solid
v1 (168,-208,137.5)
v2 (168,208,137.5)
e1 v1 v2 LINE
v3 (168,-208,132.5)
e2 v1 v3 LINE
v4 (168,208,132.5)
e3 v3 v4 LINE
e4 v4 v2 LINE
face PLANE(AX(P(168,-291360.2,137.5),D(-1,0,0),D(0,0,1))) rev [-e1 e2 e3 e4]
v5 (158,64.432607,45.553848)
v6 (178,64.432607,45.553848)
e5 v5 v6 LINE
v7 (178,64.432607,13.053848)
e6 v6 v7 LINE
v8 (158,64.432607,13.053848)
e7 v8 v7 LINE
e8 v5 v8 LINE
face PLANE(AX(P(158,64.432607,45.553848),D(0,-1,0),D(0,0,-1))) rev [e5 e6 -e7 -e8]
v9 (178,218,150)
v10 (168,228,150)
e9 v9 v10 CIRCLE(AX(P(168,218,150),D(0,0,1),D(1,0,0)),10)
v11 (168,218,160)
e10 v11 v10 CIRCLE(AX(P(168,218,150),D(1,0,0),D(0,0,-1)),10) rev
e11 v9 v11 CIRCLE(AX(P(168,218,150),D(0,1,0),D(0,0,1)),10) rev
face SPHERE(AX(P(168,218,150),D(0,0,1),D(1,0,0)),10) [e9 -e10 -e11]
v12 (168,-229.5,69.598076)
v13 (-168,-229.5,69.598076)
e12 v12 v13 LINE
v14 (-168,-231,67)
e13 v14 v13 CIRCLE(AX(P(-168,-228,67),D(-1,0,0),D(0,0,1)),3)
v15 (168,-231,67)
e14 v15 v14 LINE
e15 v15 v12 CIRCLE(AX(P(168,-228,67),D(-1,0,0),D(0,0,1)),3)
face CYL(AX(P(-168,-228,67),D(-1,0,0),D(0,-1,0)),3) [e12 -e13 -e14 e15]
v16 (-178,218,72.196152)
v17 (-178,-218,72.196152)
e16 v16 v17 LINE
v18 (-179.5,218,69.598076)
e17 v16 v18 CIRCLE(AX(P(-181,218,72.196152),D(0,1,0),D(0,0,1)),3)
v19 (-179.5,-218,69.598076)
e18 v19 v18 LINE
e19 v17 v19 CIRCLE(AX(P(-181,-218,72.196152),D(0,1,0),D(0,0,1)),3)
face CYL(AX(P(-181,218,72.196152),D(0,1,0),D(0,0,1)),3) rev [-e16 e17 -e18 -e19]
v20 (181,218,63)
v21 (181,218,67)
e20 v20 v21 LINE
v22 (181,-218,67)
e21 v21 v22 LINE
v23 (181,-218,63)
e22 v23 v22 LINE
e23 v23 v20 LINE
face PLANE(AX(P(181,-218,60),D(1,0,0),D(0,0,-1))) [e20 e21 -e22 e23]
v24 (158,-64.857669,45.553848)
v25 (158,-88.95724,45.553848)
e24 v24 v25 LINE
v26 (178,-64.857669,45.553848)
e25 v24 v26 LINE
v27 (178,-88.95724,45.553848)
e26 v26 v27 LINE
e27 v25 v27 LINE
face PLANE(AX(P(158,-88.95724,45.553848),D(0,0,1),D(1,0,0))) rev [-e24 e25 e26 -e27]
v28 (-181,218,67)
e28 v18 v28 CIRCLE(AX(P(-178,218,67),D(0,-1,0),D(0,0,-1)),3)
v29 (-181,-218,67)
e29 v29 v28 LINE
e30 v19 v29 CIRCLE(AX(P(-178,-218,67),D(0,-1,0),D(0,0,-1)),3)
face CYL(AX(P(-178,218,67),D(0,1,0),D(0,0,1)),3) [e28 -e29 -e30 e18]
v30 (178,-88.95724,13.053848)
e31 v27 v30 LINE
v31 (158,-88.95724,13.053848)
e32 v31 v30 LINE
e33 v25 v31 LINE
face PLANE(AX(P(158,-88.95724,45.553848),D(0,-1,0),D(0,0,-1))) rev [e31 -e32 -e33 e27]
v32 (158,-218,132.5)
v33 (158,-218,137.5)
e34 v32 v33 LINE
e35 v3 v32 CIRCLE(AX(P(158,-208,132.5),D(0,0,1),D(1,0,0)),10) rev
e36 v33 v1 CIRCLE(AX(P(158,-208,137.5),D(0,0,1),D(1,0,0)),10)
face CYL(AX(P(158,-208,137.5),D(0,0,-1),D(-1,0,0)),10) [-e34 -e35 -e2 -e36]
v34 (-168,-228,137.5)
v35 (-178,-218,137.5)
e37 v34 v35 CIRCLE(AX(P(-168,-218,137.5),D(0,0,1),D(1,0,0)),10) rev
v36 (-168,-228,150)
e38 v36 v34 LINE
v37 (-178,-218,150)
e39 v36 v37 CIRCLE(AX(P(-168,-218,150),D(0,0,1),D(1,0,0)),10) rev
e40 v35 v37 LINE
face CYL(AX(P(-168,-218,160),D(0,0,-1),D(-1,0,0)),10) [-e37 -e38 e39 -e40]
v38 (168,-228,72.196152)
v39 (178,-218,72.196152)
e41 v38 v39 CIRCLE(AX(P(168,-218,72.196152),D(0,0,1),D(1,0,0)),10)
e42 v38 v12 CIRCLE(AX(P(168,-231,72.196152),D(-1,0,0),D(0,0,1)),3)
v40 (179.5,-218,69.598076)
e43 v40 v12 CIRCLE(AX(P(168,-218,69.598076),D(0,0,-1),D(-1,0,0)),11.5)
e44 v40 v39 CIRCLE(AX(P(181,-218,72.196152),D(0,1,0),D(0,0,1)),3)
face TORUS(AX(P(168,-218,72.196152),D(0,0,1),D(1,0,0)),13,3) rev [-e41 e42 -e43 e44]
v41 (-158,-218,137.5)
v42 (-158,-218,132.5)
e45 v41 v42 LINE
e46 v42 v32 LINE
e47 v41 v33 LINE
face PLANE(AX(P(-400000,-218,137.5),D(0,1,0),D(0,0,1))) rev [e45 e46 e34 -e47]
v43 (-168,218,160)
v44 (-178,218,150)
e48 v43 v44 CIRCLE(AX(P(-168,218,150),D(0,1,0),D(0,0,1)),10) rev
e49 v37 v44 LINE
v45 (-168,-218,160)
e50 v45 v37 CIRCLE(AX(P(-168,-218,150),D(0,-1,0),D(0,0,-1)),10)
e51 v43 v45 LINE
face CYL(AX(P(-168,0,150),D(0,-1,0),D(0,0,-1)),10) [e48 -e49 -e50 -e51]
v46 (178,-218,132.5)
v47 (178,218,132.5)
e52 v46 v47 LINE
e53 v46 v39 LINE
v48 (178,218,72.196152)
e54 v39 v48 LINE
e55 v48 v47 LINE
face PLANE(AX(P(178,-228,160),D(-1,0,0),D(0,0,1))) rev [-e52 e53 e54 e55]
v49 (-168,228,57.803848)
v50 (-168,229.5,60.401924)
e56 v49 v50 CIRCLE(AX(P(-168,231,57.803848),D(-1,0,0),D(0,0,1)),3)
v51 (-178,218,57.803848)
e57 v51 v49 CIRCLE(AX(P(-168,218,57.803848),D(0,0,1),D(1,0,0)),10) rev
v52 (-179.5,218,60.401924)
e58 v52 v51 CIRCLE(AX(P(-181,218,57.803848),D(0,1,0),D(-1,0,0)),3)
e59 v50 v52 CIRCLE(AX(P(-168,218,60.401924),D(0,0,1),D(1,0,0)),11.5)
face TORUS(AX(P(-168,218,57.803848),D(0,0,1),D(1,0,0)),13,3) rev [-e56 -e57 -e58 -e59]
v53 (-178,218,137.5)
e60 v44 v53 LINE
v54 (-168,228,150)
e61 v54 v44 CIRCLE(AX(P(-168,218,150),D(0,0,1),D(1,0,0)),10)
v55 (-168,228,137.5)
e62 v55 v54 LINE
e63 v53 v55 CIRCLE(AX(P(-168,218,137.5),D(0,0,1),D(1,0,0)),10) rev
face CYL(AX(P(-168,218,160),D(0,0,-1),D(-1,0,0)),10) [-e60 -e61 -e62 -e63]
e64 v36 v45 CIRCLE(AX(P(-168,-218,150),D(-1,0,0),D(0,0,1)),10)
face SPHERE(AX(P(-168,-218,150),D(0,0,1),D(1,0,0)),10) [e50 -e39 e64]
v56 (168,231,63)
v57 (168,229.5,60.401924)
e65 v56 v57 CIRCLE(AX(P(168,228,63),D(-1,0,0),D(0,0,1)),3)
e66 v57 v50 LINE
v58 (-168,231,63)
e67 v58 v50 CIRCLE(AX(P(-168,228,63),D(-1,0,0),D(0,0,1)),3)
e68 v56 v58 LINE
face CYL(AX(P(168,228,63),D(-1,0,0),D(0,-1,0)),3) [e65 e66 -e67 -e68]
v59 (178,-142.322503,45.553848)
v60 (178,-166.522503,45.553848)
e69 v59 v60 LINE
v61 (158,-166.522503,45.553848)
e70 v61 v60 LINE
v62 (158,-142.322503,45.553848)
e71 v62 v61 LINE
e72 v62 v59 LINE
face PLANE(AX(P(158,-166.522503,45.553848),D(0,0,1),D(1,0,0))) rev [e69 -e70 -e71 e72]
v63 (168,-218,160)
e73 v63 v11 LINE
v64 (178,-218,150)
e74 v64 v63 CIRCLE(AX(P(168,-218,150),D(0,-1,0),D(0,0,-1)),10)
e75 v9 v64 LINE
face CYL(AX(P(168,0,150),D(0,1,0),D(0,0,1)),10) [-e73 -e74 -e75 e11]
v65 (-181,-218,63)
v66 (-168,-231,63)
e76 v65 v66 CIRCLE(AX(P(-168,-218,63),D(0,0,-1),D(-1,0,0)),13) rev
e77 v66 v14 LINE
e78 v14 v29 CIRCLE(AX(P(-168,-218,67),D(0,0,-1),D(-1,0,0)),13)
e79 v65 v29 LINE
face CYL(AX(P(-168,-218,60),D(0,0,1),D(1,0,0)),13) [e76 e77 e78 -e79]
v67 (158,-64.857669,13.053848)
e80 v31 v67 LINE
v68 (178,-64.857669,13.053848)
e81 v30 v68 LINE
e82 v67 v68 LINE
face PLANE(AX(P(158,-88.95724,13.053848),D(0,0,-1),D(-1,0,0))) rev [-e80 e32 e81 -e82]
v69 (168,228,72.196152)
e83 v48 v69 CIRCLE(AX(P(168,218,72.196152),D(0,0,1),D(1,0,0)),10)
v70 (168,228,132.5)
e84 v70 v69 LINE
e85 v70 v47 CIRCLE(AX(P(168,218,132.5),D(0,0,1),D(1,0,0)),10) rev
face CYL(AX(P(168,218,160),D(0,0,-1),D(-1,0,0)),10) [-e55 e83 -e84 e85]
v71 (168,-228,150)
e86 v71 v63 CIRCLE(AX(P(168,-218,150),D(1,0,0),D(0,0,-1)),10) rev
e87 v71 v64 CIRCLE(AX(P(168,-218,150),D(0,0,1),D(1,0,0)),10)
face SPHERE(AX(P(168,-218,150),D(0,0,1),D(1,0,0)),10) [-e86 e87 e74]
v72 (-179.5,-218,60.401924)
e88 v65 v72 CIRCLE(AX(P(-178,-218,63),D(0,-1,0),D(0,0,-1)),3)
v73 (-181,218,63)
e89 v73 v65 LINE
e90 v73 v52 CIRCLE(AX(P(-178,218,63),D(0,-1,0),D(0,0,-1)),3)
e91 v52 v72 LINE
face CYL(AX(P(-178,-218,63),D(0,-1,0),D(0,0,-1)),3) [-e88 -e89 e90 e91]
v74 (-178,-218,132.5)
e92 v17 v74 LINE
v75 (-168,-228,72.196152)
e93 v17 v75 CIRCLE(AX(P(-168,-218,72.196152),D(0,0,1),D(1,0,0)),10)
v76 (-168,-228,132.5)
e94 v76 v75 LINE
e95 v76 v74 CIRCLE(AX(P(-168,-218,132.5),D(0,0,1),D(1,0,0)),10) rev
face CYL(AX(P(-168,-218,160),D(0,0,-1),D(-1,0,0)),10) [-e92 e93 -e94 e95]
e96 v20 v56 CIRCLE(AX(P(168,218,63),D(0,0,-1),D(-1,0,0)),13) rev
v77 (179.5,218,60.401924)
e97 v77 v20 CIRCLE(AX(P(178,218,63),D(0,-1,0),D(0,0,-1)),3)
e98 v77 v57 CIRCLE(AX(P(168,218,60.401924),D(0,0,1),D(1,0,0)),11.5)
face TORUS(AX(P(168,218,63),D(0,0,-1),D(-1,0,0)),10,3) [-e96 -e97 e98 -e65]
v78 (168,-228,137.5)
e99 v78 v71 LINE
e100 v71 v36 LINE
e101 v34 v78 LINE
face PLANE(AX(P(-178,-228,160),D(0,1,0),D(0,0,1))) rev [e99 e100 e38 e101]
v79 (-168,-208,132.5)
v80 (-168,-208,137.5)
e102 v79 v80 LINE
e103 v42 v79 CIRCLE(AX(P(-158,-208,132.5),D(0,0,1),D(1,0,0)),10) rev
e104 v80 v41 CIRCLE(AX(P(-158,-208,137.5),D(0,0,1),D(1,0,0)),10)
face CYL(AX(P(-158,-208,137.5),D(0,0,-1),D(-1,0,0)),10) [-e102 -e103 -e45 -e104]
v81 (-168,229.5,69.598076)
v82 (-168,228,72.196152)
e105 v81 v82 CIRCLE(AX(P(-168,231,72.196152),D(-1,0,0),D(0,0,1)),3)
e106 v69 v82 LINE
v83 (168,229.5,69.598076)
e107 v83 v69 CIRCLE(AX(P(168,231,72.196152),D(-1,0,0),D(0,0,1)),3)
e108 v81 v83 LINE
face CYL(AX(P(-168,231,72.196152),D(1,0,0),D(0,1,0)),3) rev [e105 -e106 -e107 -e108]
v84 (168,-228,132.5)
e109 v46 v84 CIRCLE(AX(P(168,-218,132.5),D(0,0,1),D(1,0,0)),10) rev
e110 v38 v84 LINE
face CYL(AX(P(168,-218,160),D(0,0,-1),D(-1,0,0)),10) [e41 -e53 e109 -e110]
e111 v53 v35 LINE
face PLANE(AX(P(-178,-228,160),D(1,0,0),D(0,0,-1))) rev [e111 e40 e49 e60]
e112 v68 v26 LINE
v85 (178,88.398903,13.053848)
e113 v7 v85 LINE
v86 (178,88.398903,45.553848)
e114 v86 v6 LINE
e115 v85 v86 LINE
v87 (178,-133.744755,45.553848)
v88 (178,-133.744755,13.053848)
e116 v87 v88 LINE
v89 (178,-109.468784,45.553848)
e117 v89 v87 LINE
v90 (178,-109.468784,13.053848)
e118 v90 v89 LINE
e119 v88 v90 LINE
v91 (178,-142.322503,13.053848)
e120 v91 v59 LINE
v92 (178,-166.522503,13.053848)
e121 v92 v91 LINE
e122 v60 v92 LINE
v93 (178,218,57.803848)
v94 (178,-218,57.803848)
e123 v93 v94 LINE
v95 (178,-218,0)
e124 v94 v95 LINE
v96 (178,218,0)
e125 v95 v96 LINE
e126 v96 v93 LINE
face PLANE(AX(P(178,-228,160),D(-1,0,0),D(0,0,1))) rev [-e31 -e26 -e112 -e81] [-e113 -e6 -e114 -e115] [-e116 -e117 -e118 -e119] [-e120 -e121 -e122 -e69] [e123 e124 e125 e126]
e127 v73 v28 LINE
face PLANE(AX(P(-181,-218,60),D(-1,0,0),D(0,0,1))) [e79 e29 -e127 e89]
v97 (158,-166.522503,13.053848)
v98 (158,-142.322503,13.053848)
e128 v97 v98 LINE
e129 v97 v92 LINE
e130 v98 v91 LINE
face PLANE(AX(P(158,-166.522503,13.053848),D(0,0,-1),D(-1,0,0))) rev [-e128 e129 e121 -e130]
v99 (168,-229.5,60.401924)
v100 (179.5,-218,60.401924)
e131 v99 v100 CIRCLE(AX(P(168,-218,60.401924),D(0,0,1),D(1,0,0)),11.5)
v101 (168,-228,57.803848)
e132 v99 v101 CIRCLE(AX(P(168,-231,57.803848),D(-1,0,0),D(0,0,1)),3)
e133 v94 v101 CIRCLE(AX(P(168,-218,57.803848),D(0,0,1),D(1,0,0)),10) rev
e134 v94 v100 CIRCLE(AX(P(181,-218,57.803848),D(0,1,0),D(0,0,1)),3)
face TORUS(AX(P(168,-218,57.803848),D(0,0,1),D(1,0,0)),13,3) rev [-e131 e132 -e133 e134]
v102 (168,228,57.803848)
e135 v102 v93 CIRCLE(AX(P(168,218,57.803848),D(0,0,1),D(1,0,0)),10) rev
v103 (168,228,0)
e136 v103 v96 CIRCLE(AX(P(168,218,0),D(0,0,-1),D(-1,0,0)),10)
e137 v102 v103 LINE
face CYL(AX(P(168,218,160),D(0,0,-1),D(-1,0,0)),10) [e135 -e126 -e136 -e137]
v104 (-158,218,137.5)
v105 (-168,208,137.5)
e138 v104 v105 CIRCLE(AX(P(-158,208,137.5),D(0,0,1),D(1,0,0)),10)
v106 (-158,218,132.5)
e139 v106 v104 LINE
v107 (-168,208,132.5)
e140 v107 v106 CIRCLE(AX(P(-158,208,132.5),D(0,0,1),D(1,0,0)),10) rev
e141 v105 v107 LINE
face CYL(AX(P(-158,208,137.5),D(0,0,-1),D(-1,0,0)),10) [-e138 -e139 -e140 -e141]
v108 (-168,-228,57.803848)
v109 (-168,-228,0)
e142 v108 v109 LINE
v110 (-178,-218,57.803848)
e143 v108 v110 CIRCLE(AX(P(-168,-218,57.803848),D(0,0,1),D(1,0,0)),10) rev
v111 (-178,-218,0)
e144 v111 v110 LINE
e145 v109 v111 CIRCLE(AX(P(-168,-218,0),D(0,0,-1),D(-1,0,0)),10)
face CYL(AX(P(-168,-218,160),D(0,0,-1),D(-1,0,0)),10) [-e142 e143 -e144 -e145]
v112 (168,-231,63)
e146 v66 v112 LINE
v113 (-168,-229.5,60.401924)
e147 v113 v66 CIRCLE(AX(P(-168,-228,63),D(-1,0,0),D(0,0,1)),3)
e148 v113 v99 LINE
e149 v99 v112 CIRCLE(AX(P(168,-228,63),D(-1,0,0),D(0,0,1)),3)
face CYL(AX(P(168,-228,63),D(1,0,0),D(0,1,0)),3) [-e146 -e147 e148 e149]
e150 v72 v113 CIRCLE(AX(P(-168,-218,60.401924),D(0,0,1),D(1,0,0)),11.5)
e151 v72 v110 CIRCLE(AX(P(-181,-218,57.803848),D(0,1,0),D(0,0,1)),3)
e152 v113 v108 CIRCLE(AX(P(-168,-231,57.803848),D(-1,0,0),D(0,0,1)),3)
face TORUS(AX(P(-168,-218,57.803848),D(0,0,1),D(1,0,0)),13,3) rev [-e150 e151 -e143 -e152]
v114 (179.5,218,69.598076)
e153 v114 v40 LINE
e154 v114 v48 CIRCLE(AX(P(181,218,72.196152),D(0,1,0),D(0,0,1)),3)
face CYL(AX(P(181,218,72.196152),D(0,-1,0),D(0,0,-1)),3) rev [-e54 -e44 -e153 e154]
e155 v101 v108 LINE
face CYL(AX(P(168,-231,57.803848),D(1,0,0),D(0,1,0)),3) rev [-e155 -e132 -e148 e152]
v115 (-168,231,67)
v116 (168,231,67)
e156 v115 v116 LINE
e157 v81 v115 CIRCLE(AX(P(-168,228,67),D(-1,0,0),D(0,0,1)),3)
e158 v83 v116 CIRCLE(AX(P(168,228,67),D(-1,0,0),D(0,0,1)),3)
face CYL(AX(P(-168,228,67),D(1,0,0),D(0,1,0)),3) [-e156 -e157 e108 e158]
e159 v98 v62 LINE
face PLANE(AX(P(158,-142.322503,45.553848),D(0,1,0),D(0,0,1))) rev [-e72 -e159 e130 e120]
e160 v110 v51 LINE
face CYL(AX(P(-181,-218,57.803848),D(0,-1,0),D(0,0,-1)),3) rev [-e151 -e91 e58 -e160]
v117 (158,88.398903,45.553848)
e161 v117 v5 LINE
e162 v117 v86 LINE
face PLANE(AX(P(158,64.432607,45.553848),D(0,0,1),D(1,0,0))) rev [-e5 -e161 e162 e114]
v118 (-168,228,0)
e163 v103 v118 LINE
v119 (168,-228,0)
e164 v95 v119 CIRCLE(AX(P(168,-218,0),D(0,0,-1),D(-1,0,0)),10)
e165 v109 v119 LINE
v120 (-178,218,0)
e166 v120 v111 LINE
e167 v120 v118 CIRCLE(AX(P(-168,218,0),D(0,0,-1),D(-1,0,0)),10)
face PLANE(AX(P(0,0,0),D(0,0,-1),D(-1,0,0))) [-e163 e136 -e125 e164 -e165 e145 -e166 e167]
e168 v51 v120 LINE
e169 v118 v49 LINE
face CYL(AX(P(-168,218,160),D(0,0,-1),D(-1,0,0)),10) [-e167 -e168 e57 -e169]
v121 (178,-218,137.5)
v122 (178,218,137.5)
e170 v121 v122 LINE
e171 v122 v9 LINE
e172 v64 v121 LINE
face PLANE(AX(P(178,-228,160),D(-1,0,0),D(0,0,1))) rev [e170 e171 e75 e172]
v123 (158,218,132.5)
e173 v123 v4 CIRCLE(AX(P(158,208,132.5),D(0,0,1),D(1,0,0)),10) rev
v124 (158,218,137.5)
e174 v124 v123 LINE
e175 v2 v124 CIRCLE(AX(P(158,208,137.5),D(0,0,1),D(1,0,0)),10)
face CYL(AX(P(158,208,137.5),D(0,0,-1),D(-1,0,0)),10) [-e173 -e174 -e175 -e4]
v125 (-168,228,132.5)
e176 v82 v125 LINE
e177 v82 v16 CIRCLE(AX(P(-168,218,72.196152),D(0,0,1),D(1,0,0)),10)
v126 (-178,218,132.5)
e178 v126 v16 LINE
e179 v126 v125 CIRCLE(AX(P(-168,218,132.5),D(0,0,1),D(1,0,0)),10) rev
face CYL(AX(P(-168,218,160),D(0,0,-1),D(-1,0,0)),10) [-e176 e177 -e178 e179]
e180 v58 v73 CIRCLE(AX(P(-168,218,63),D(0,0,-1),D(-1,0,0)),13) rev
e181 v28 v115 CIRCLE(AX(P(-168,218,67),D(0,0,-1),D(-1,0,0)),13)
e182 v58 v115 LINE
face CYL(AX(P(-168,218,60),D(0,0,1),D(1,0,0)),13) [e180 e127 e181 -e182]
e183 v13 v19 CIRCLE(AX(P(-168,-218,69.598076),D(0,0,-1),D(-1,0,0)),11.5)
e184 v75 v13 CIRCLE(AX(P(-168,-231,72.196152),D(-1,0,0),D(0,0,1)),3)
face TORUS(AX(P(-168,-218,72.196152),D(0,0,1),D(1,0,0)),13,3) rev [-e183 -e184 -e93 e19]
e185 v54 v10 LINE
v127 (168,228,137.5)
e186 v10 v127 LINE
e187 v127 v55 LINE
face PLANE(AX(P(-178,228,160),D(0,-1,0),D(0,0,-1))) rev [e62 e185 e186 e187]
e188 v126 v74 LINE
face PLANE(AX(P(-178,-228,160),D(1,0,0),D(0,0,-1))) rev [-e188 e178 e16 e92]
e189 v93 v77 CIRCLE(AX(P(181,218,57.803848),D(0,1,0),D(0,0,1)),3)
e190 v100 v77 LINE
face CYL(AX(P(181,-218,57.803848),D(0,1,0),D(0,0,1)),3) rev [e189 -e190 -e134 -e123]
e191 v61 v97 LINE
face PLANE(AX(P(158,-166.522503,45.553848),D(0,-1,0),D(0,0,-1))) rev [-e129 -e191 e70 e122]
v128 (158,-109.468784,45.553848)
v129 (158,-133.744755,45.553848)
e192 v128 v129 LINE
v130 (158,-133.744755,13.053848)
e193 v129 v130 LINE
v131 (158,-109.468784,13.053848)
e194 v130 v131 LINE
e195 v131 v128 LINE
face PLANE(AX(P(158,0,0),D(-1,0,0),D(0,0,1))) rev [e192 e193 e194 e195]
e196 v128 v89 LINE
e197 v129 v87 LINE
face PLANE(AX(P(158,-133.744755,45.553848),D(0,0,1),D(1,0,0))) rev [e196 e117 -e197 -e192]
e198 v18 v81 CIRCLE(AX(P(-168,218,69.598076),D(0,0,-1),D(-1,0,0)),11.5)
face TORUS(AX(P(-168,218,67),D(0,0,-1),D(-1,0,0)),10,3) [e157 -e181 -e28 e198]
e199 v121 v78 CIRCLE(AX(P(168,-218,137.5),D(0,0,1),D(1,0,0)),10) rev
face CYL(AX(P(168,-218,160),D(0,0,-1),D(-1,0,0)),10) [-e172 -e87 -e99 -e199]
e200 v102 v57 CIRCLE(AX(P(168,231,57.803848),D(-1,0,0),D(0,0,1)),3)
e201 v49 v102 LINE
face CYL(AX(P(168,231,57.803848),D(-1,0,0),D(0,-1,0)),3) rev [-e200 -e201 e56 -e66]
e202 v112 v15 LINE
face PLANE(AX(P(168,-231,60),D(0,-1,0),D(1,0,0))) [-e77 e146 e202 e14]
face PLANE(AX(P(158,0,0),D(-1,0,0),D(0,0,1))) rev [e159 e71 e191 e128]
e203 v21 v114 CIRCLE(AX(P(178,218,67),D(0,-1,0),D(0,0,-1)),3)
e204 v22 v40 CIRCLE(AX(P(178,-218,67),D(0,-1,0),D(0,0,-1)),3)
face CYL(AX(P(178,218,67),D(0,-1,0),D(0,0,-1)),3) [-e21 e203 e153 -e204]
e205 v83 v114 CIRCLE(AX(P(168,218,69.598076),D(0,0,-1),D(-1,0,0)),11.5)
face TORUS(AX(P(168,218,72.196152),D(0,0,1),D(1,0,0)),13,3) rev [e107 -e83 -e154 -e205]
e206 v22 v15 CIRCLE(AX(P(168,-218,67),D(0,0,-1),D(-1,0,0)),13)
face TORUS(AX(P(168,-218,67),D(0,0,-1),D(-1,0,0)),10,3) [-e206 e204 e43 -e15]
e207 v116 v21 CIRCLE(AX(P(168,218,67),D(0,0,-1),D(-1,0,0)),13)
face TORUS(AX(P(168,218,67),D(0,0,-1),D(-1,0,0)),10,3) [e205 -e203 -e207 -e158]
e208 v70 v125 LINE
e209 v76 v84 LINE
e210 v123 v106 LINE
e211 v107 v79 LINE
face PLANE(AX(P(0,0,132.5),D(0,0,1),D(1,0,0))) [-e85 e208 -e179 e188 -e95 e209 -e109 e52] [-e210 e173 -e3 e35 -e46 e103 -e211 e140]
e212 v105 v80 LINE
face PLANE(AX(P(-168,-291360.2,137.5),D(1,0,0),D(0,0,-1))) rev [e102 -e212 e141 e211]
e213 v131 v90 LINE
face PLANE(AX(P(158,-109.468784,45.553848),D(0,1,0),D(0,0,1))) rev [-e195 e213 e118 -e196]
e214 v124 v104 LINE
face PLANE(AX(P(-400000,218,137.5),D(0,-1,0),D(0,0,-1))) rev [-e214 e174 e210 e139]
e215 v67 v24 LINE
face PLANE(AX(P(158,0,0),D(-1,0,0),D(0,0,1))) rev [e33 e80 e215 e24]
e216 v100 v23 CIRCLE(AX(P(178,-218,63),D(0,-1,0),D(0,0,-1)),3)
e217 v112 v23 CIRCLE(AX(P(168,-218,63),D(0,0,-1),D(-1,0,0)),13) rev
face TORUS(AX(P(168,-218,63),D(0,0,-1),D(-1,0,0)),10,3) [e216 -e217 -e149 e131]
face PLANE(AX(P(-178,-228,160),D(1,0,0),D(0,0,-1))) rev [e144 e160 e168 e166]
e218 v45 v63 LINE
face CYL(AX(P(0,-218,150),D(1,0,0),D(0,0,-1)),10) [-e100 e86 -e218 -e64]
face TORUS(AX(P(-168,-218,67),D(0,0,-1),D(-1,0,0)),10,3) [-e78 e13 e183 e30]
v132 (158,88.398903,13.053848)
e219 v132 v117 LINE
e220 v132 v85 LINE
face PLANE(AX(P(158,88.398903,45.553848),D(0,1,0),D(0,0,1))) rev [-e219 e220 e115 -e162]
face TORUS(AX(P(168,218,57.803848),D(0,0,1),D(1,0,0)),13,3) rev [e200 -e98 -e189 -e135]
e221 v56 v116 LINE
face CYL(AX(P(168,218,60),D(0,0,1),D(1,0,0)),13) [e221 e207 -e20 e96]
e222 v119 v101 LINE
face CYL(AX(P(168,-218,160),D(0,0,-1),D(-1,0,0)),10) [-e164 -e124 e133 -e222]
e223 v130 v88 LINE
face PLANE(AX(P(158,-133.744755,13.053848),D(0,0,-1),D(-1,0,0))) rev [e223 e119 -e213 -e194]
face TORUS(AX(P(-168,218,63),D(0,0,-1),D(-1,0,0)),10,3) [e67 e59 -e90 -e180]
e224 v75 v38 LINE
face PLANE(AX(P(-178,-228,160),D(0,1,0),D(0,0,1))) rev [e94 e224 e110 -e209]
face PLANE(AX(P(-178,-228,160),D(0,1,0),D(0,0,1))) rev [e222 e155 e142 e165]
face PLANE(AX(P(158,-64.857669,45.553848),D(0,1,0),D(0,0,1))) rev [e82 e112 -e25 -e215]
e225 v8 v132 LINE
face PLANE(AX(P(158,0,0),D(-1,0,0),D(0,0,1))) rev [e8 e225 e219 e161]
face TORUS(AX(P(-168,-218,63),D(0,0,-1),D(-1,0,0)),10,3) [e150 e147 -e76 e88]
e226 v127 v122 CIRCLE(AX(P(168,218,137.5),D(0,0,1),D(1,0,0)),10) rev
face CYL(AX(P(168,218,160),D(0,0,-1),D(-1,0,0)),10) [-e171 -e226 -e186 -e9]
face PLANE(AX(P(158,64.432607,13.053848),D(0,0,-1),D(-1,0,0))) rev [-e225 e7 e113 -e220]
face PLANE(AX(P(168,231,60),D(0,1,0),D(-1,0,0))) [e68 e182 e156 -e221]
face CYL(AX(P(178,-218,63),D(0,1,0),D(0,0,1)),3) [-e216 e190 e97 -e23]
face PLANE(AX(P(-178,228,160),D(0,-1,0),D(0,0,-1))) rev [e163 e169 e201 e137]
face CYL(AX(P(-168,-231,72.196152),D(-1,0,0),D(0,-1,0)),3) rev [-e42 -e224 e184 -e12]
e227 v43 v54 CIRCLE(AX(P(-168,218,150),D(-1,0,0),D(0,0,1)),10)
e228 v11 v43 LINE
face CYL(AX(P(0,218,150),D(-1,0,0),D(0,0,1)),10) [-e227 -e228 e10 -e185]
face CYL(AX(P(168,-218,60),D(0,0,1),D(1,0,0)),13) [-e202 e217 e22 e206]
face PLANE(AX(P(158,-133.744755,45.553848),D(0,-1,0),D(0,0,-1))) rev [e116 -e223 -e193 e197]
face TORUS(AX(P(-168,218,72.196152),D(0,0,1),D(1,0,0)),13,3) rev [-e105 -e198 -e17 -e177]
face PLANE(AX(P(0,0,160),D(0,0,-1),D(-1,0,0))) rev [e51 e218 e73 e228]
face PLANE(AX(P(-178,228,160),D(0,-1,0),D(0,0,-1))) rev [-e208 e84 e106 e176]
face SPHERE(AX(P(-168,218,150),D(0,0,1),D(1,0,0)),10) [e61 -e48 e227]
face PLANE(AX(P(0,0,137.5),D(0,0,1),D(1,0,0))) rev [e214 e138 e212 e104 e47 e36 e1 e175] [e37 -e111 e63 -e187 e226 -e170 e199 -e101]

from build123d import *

# Parameters (mm, degrees)
CROQUIS1_W                   = 356
CROQUIS1_H                   = 456
SALIENTE_EXTRUIR1_DEPTH      = 160
REDONDEO1_R                  = 10
CORTAR_EXTRUIR1_DEPTH        = 2.5
CORTAR_EXTRUIR1_DEPTH_BACK   = 2.5
CORTAR_EXTRUIR1_START        = -25
CROQUIS2_W                   = 356
CROQUIS2_H                   = 456
CROQUIS2_W_2                 = 336
CROQUIS2_H_2                 = 436
REDONDEO2_R                  = 10
SALIENTE_EXTRUIR2_DEPTH      = 5
SALIENTE_EXTRUIR2_DEPTH_BACK = 5
REDONDEO6_R                  = 3
REDONDEO7_R                  = 3
REDONDEO8_R                  = 3
CROQUIS5_W                   = 32.5
CROQUIS5_H                   = 24.2
CROQUIS5_H_2                 = 24.275971101
CROQUIS5_H_3                 = 24.099571128
CROQUIS5_H_4                 = 23.966296081
CORTAR_EXTRUIR2_DEPTH        = 20


# Some blends are built 0.0001 mm under size
with BuildPart() as part:
    # Croquis1 → Saliente-Extruir1 (new body)
    with BuildSketch(Plane.XY):
        Rectangle(CROQUIS1_W, CROQUIS1_H)
    extrude(amount=SALIENTE_EXTRUIR1_DEPTH)

    # Redondeo1
    redondeo1_edges = [part.edges().sort_by_distance(p)[0] for p in [
        (-178, 0, 160),
        (0, -228, 160),
        (178, 0, 160),
        (178, -228, 80),
        (-178, -228, 80),
        (-178, 228, 80),
        (178, 228, 80),
        (0, 228, 160),
    ]]
    fillet(redondeo1_edges, radius=REDONDEO1_R)

    # Croquis2 → Cortar-Extruir1 (cut, two sides: drawn at the far end of the back side and taken through both)
    with BuildSketch(Plane.XY.offset(160).offset(CORTAR_EXTRUIR1_START - CORTAR_EXTRUIR1_DEPTH_BACK)):
        Rectangle(CROQUIS2_W, CROQUIS2_H)
        Rectangle(CROQUIS2_W_2, CROQUIS2_H_2, mode=Mode.SUBTRACT)
    extrude(amount=CORTAR_EXTRUIR1_DEPTH + CORTAR_EXTRUIR1_DEPTH_BACK, mode=Mode.SUBTRACT)

    # Redondeo2
    redondeo2_edges = [part.edges().sort_by_distance(p)[0] for p in [
        (168, 218, 135),
        (-168, 218, 135),
        (-168, -218, 135),
        (168, -218, 135),
    ]]
    fillet(redondeo2_edges, radius=REDONDEO2_R)

    # Croquis4 → Saliente-Extruir2 (add, two sides: drawn at the far end of the back side and taken through both)
    with BuildSketch(Plane.XY.offset(65).offset(-SALIENTE_EXTRUIR2_DEPTH_BACK)):
        with BuildLine():
            Line((168, -231), (-168, -231))
            ThreePointArc((-168, -231), (-177.192388155, -227.192388155), (-181, -218))
            Line((-181, -218), (-181, 218))
            ThreePointArc((-181, 218), (-177.192388155, 227.192388155), (-168, 231))
            Line((-168, 231), (168, 231))
            ThreePointArc((168, 231), (177.192388155, 227.192388155), (181, 218))
            Line((181, 218), (181, -218))
            ThreePointArc((181, -218), (177.192388155, -227.192388155), (168, -231))
        make_face()
    extrude(amount=SALIENTE_EXTRUIR2_DEPTH + SALIENTE_EXTRUIR2_DEPTH_BACK)

    # Redondeo6
    redondeo6_edges = [part.edges().sort_by_distance(p)[0] for p in [
        (-177.192388155, 227.192388155, 70),
        (-181, 0, 70),
        (-177.192388155, -227.192388155, 70),
        (0, -231, 70),
        (177.192388155, -227.192388155, 70),
        (181, 0, 70),
        (177.192388155, 227.192388155, 70),
        (0, 231, 70),
        (-177.192388155, 227.192388155, 60),
        (0, 231, 60),
        (177.192388155, 227.192388155, 60),
        (181, 0, 60),
        (177.192388155, -227.192388155, 60),
        (0, -231, 60),
        (-177.192388155, -227.192388155, 60),
        (-181, 0, 60),
    ]]
    fillet(redondeo6_edges, radius=REDONDEO6_R - 0.0001)  # a hair under: the kernel refuses the full size

    # Redondeo7
    # the kernel refuses this fillet: 3 mm, written as the material it adds along each edge
    with BuildSketch(Plane(origin=(178, 218, 60), x_dir=(0.9659313848535178, 0, 0.25879829936644666), z_dir=(0, -1, 0)), Plane(origin=(-178, -218, 60), x_dir=(-0.9659313848535145, 0, 0.25879829936645976), z_dir=(0, 1, 0))) as redondeo7_piece_1:
        with BuildLine():
            CenterArc((2.329422704, -2.897768274), REDONDEO7_R, 105.000679234, 60.000551337)
            Line((-0.56837145, -2.121373376), (-0.858150866, -2.043733886))
            Line((-0.858150866, -2.043733886), (-0.289779415, 0.07763949))
            Line((-0.289779415, 0.07763949), (0.07763949, 0.289779415))
            ThreePointArc((0.07763949, 0.289779415), (0.077736083, 0.289753536), (1.475282068, 0.289776827))
            Line((1.475282068, 0.289776827), (1.552931216, 0))
        make_face()
    extrude(amount=436)
    with BuildSketch(Plane(origin=(-168, -218, 60), x_dir=(-1, 0, 0), z_dir=(0, 1, 0))) as redondeo7_piece_2:
        with BuildLine():
            CenterArc((13, -2.196194687), REDONDEO7_R, 119.999448663, 60.000551337)
            Line((10, -2.196194687), (9.7, -2.196194687))
            Line((9.7, -2.196194687), (9.7, 0))
            Line((9.7, 0), (10, 0.3))
            ThreePointArc((10, 0.3), (10.0001, 0.3), (11.3500275, 0.661705022))
            Line((11.3500275, 0.661705022), (11.500025, 0.401895958))
        make_face()
    revolve(axis=Axis((-168, -218, 60), (0, 0, 1)), revolution_arc=90)
    with BuildSketch(Plane(origin=(168, -218, 60), x_dir=(0, -1, 0), z_dir=(-1, 0, 0))) as redondeo7_piece_3:
        with BuildLine():
            CenterArc((13, -2.196194687), REDONDEO7_R, 119.999448663, 60.000551337)
            Line((10, -2.196194687), (9.7, -2.196194687))
            Line((9.7, -2.196194687), (9.7, 0))
            Line((9.7, 0), (10, 0.3))
            ThreePointArc((10, 0.3), (10.0001, 0.3), (11.3500275, 0.661705022))
            Line((11.3500275, 0.661705022), (11.500025, 0.401895958))
        make_face()
    revolve(axis=Axis((168, -218, 60), (0, 0, 1)), revolution_arc=90)
    with BuildSketch(Plane(origin=(168, 218, 60), x_dir=(1, 0, 0), z_dir=(0, -1, 0))) as redondeo7_piece_4:
        with BuildLine():
            CenterArc((13, -2.196194687), REDONDEO7_R, 119.999448663, 60.000551337)
            Line((10, -2.196194687), (9.7, -2.196194687))
            Line((9.7, -2.196194687), (9.7, 0))
            Line((9.7, 0), (10, 0.3))
            ThreePointArc((10, 0.3), (10.0001, 0.3), (11.3500275, 0.661705022))
            Line((11.3500275, 0.661705022), (11.500025, 0.401895958))
        make_face()
    revolve(axis=Axis((168, 218, 60), (0, 0, 1)), revolution_arc=90)
    with BuildSketch(Plane(origin=(-168, 218, 60), x_dir=(0, 1, 0), z_dir=(1, 0, 0))) as redondeo7_piece_5:
        with BuildLine():
            CenterArc((13, -2.196194687), REDONDEO7_R, 119.999448663, 60.000551337)
            Line((10, -2.196194687), (9.7, -2.196194687))
            Line((9.7, -2.196194687), (9.7, 0))
            Line((9.7, 0), (10, 0.3))
            ThreePointArc((10, 0.3), (10.0001, 0.3), (11.3500275, 0.661705022))
            Line((11.3500275, 0.661705022), (11.500025, 0.401895958))
        make_face()
    revolve(axis=Axis((-168, 218, 60), (0, 0, 1)), revolution_arc=90)
    with BuildSketch(Plane(origin=(-168, 228, 60), x_dir=(0, 0.9659313848535145, 0.25879829936645976), z_dir=(1, 0, 0)), Plane(origin=(168, -228, 60), x_dir=(0, -0.9659313848535215, 0.2587982993664339), z_dir=(-1, 0, 0))) as redondeo7_piece_6:
        with BuildLine():
            CenterArc((2.329422704, -2.897768274), REDONDEO7_R, 105.000679234, 60.000551337)
            Line((-0.56837145, -2.121373376), (-0.858150866, -2.043733886))
            Line((-0.858150866, -2.043733886), (-0.289779415, 0.07763949))
            Line((-0.289779415, 0.07763949), (0.07763949, 0.289779415))
            ThreePointArc((0.07763949, 0.289779415), (0.077736083, 0.289753536), (1.475282068, 0.289776827))
            Line((1.475282068, 0.289776827), (1.552931216, 0))
        make_face()
    extrude(amount=336)

    # Redondeo8
    # the kernel refuses this fillet: 3 mm, written as the material it adds along each edge
    with BuildSketch(Plane(origin=(178, 218, 70), x_dir=(0.965931384853519, 0, -0.2587982993664427), z_dir=(0, -1, 0)), Plane(origin=(-178, -218, 70), x_dir=(-0.9659313848535145, 0, -0.25879829936645976), z_dir=(0, 1, 0))) as redondeo8_piece_1:
        with BuildLine():
            CenterArc((2.329422704, 2.897768274), REDONDEO8_R, 194.99876943, 60.000551337)
            Line((-0.56837145, 2.121373376), (-0.858150866, 2.043733886))
            Line((-0.858150866, 2.043733886), (-0.289779415, -0.07763949))
            Line((-0.289779415, -0.07763949), (0.07763949, -0.289779415))
            ThreePointArc((0.07763949, -0.289779415), (0.077736083, -0.289753536), (1.475282068, -0.289776827))
            Line((1.475282068, -0.289776827), (1.552931216, 0))
        make_face()
    extrude(amount=436)
    with BuildSketch(Plane(origin=(-168, 228, 70), x_dir=(0, 0.9659313848535145, -0.25879829936645976), z_dir=(1, 0, 0)), Plane(origin=(168, -228, 70), x_dir=(0, -0.9659313848535178, -0.25879829936644666), z_dir=(-1, 0, 0))) as redondeo8_piece_2:
        with BuildLine():
            CenterArc((2.329422704, 2.897768274), REDONDEO8_R, 194.99876943, 60.000551337)
            Line((-0.56837145, 2.121373376), (-0.858150866, 2.043733886))
            Line((-0.858150866, 2.043733886), (-0.289779415, -0.07763949))
            Line((-0.289779415, -0.07763949), (0.07763949, -0.289779415))
            ThreePointArc((0.07763949, -0.289779415), (0.077736083, -0.289753536), (1.475282068, -0.289776827))
            Line((1.475282068, -0.289776827), (1.552931216, 0))
        make_face()
    extrude(amount=336)
    with BuildSketch(Plane(origin=(-168, -218, 70), x_dir=(-1, 0, 0), z_dir=(0, 1, 0))) as redondeo8_piece_3:
        with BuildLine():
            CenterArc((13, 2.196194687), REDONDEO8_R, 180, 60.000551337)
            Line((10, 2.196194687), (9.7, 2.196194687))
            Line((9.7, 2.196194687), (9.7, 0))
            Line((9.7, 0), (10, -0.3))
            ThreePointArc((10, -0.3), (10.0001, -0.3), (11.3500275, -0.661705022))
            Line((11.3500275, -0.661705022), (11.500025, -0.401895958))
        make_face()
    revolve(axis=Axis((-168, -218, 70), (0, 0, 1)), revolution_arc=90)
    with BuildSketch(Plane(origin=(168, -218, 70), x_dir=(0, -1, 0), z_dir=(-1, 0, 0))) as redondeo8_piece_4:
        with BuildLine():
            CenterArc((13, 2.196194687), REDONDEO8_R, 180, 60.000551337)
            Line((10, 2.196194687), (9.7, 2.196194687))
            Line((9.7, 2.196194687), (9.7, 0))
            Line((9.7, 0), (10, -0.3))
            ThreePointArc((10, -0.3), (10.0001, -0.3), (11.3500275, -0.661705022))
            Line((11.3500275, -0.661705022), (11.500025, -0.401895958))
        make_face()
    revolve(axis=Axis((168, -218, 70), (0, 0, 1)), revolution_arc=90)
    with BuildSketch(Plane(origin=(168, 218, 70), x_dir=(1, 0, 0), z_dir=(0, -1, 0))) as redondeo8_piece_5:
        with BuildLine():
            CenterArc((13, 2.196194687), REDONDEO8_R, 180, 60.000551337)
            Line((10, 2.196194687), (9.7, 2.196194687))
            Line((9.7, 2.196194687), (9.7, 0))
            Line((9.7, 0), (10, -0.3))
            ThreePointArc((10, -0.3), (10.0001, -0.3), (11.3500275, -0.661705022))
            Line((11.3500275, -0.661705022), (11.500025, -0.401895958))
        make_face()
    revolve(axis=Axis((168, 218, 70), (0, 0, 1)), revolution_arc=90)
    with BuildSketch(Plane(origin=(-168, 218, 70), x_dir=(0, 1, 0), z_dir=(1, 0, 0))) as redondeo8_piece_6:
        with BuildLine():
            CenterArc((13, 2.196194687), REDONDEO8_R, 180, 60.000551337)
            Line((10, 2.196194687), (9.7, 2.196194687))
            Line((9.7, 2.196194687), (9.7, 0))
            Line((9.7, 0), (10, -0.3))
            ThreePointArc((10, -0.3), (10.0001, -0.3), (11.3500275, -0.661705022))
            Line((11.3500275, -0.661705022), (11.500025, -0.401895958))
        make_face()
    revolve(axis=Axis((-168, 218, 70), (0, 0, 1)), revolution_arc=90)

    # Croquis5 → Cortar-Extruir2 (cut)
    with BuildSketch(Plane(origin=(178, 0, 0), x_dir=(0, 0, -1), z_dir=(1, 0, 0))):
        with Locations((-29.303847577, -154.422503433)):
            Rectangle(CROQUIS5_W, CROQUIS5_H)
        with Locations((-29.303847577, -121.606769627)):
            Rectangle(CROQUIS5_W, CROQUIS5_H_2)
        with Locations((-29.303847577, -76.907454446)):
            Rectangle(CROQUIS5_W, CROQUIS5_H_3)
        with Locations((-29.303847577, 76.415754786)):
            Rectangle(CROQUIS5_W, CROQUIS5_H_4)
    extrude(amount=-CORTAR_EXTRUIR2_DEPTH, mode=Mode.SUBTRACT)


solid = part.part
